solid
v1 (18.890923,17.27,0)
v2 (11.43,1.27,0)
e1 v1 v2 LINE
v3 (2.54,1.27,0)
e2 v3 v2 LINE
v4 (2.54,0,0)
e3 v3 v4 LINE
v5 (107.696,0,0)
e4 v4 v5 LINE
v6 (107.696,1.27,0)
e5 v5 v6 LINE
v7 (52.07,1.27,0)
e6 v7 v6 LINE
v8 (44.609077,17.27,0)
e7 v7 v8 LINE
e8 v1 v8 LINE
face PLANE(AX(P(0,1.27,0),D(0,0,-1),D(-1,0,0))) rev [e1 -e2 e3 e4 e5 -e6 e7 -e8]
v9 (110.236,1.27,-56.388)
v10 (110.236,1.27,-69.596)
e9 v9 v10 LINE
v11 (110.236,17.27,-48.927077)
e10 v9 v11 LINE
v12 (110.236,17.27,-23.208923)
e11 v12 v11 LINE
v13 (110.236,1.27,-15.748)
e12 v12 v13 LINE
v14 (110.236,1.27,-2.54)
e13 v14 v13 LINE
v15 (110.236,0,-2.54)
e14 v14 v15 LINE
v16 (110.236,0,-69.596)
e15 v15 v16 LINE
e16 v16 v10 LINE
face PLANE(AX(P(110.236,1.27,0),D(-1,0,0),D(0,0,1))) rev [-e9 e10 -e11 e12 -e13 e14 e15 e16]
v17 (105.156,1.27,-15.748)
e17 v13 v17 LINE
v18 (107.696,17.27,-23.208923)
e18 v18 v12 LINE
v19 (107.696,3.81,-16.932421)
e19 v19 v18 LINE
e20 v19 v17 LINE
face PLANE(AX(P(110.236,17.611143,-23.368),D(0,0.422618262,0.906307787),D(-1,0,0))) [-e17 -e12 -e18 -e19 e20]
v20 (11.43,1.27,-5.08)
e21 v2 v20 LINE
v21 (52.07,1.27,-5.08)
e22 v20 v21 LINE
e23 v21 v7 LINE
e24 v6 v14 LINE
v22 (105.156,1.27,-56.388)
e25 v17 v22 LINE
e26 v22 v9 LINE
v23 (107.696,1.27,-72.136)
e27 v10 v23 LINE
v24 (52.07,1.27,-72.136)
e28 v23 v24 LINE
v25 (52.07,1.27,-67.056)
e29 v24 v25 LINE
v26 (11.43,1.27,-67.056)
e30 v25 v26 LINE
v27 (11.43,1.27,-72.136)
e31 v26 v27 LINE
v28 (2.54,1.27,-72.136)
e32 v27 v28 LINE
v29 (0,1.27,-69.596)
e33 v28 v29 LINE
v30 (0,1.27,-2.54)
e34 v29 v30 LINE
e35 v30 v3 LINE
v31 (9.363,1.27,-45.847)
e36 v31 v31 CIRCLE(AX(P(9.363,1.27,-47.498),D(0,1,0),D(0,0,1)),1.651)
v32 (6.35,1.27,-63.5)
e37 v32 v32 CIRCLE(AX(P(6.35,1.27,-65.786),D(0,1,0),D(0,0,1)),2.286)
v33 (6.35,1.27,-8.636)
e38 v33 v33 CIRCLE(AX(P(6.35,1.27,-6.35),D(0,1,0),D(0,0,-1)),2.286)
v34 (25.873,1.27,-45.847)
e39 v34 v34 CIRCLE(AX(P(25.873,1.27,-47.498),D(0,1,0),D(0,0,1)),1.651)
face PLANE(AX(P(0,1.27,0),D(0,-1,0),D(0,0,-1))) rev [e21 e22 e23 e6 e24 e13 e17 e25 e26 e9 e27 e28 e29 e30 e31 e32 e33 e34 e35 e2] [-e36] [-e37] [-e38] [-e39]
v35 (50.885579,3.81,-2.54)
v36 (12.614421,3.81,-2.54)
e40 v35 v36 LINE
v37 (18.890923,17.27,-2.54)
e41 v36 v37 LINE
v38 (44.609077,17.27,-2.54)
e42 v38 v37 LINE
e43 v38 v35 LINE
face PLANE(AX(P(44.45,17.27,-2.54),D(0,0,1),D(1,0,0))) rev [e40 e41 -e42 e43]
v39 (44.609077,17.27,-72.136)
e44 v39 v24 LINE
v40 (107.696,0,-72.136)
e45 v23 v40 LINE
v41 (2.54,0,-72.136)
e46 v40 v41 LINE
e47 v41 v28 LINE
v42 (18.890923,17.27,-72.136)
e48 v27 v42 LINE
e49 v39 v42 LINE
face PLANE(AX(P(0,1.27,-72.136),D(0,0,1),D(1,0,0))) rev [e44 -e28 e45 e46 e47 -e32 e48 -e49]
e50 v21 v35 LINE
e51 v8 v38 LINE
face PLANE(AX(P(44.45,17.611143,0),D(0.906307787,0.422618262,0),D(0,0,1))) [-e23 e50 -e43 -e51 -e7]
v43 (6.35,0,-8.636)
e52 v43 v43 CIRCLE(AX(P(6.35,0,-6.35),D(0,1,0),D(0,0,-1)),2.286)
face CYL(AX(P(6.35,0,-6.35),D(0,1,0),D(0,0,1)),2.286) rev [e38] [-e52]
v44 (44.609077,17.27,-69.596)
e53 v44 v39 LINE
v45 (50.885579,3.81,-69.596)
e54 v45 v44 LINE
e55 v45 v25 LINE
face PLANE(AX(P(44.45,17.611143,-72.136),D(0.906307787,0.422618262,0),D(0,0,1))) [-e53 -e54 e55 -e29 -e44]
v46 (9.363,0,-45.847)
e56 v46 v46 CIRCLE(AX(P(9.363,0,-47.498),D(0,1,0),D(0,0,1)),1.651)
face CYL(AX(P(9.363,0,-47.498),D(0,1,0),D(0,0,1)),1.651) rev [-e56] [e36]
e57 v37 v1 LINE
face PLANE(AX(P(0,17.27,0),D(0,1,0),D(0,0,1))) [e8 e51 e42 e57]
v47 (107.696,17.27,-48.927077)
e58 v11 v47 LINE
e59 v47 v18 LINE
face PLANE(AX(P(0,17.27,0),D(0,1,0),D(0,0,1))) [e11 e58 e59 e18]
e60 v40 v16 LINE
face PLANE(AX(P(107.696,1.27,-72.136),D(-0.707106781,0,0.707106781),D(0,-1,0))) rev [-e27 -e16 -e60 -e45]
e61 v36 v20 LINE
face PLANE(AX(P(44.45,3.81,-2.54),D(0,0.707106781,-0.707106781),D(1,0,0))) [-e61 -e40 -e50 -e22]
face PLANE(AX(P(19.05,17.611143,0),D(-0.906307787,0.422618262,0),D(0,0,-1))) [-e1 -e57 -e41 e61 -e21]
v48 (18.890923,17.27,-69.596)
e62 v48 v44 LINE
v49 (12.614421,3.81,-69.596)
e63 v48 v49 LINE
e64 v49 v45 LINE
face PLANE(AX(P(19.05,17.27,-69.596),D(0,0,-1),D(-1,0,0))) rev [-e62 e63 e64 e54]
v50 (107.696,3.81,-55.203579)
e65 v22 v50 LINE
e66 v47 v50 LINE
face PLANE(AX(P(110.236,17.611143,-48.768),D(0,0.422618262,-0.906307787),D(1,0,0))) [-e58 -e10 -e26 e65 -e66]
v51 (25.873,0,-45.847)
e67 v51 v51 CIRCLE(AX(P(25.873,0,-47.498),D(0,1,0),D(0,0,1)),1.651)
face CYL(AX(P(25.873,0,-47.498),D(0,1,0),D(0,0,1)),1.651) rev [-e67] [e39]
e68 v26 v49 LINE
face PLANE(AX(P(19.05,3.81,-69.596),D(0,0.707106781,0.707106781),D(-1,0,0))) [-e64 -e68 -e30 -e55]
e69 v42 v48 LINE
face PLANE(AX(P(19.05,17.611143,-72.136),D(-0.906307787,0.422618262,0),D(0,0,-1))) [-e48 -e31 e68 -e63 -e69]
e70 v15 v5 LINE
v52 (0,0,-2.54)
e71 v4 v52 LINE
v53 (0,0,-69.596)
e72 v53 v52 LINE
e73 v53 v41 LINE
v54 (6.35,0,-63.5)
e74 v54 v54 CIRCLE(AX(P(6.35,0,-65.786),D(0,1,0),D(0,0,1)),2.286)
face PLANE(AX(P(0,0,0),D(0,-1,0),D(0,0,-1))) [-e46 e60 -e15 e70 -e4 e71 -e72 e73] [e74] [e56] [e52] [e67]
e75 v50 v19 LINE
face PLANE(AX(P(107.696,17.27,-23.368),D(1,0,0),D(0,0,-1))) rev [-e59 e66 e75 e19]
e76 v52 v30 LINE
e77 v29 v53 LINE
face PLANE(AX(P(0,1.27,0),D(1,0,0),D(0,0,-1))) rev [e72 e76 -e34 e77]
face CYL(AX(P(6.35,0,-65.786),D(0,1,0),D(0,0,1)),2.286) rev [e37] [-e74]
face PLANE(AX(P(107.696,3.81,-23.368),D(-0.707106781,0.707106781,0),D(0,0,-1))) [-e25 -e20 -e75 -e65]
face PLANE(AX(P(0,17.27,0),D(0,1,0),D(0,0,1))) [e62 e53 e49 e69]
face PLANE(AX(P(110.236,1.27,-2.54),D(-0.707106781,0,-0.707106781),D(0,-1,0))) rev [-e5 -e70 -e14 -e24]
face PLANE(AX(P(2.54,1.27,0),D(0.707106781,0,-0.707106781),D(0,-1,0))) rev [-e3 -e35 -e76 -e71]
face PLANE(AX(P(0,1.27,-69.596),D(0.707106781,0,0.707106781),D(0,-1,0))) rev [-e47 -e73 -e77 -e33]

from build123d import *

# Parameters (mm, degrees)
SKETCH1_W           = 110.236
SKETCH1_H           = 72.136
BOSS_EXTRUDE1_DEPTH = 1.27
SKETCH2_R           = 2.286
SKETCH2_R_2         = 1.651
CUT_EXTRUDE1_DEPTH  = 1.27
SKETCH3_W           = 25.4
SKETCH3_H           = 2.54
SKETCH3_W_2         = 2.54
SKETCH3_H_2         = 25.4
BOSS_EXTRUDE2_DEPTH = 16
CHAMFER1_SIZE       = 7.62
CHAMFER1_SIZE_2     = 16.341142734
CHAMFER2_SIZE       = 2.54
CHAMFER3_SIZE       = 2.54


with BuildPart() as part:
    # Sketch1 → Boss-Extrude1 (new body)
    with BuildSketch(Plane(origin=(0, 0, 0), x_dir=(1, 0, 0), z_dir=(0, 1, 0))):
        with Locations((55.118, 36.068)):
            Rectangle(SKETCH1_W, SKETCH1_H)
    extrude(amount=BOSS_EXTRUDE1_DEPTH)

    # Sketch2 → Cut-Extrude1 (cut)
    with BuildSketch(Plane(origin=(0, 1.27, 0), x_dir=(1, 0, 0), z_dir=(0, 1, 0))):
        with Locations(Location((6.35, 65.786, 0), (0, 0, 270))):
            Circle(SKETCH2_R)
        with Locations(Location((9.363, 47.498, 0), (0, 0, 270))):
            Circle(SKETCH2_R_2)
        with Locations(Location((25.873, 47.498, 0), (0, 0, 270))):
            Circle(SKETCH2_R_2)
        with Locations(Location((6.35, 6.35, 0), (0, 0, 90))):
            Circle(SKETCH2_R)
    extrude(amount=-CUT_EXTRUDE1_DEPTH, mode=Mode.SUBTRACT)

    # Sketch3 → Boss-Extrude2 (add)
    with BuildSketch(Plane(origin=(0, 1.27, 0), x_dir=(1, 0, 0), z_dir=(0, 1, 0))):
        with Locations((31.75, 70.866)):
            Rectangle(SKETCH3_W, SKETCH3_H)
        with Locations((31.75, 1.27)):
            Rectangle(SKETCH3_W, SKETCH3_H)
        with Locations((108.966, 36.068)):
            Rectangle(SKETCH3_W_2, SKETCH3_H_2)
    extrude(amount=BOSS_EXTRUDE2_DEPTH)

    # Chamfer1
    # the kernel refuses this chamfer: 16.341142734, 7.62 mm, written as the material it adds along each edge
    with BuildSketch(Plane(origin=(44.45, 1.27, -2.54), x_dir=(0.9971975577536774, -0.07481330637060034, 0), z_dir=(0, 0, 1))) as chamfer1_piece_1_section:
        Polygon((CHAMFER1_SIZE * 0.997197557754, CHAMFER1_SIZE * 0.0748133063706), (-CHAMFER1_SIZE_2 * 0.0748133063719, CHAMFER1_SIZE_2 * 0.997197557771), (0, 0), align=None)
    chamfer1_piece_1 = extrude(amount=2.54, mode=Mode.PRIVATE)
    chamfer1_piece_1 = split(chamfer1_piece_1, bisect_by=Plane(origin=(46.87141812, 17.27, -1.27), z_dir=(0, -1, 0)), keep=Keep.TOP, mode=Mode.PRIVATE)
    add(chamfer1_piece_1)
    with BuildSketch(Plane(origin=(44.45, 1.27, -72.136), x_dir=(0.9971975577536774, -0.07481330637060034, 2.7895727589747506e-15), z_dir=(0, 0, 1))) as chamfer1_piece_2_section:
        Polygon((CHAMFER1_SIZE * 0.997197557754, CHAMFER1_SIZE * 0.0748133063706), (-CHAMFER1_SIZE_2 * 0.0748133063719, CHAMFER1_SIZE_2 * 0.997197557771), (0, 0), align=None)
    chamfer1_piece_2 = extrude(amount=2.54, mode=Mode.PRIVATE)
    chamfer1_piece_2 = split(chamfer1_piece_2, bisect_by=Plane(origin=(46.87141812, 17.27, -70.866), z_dir=(0, -1, 0)), keep=Keep.TOP, mode=Mode.PRIVATE)
    add(chamfer1_piece_2)
    with BuildSketch(Plane(origin=(19.05, 1.27, 0), x_dir=(-0.9971975577536774, -0.07481330637060028, 0), z_dir=(0, 0, -1))) as chamfer1_piece_3_section:
        Polygon((CHAMFER1_SIZE * 0.997197557754, CHAMFER1_SIZE * 0.0748133063706), (-CHAMFER1_SIZE_2 * 0.0748133063719, CHAMFER1_SIZE_2 * 0.997197557771), (0, 0), align=None)
    chamfer1_piece_3 = extrude(amount=2.54, mode=Mode.PRIVATE)
    chamfer1_piece_3 = split(chamfer1_piece_3, bisect_by=Plane(origin=(16.62858188, 17.27, -1.27), z_dir=(0, -1, 0)), keep=Keep.TOP, mode=Mode.PRIVATE)
    add(chamfer1_piece_3)
    with BuildSketch(Plane(origin=(19.05, 1.27, -69.596), x_dir=(-0.9971975577536774, -0.07481330637060032, 5.5791455179495004e-15), z_dir=(0, 0, -1))) as chamfer1_piece_4_section:
        Polygon((CHAMFER1_SIZE * 0.997197557754, CHAMFER1_SIZE * 0.0748133063706), (-CHAMFER1_SIZE_2 * 0.0748133063719, CHAMFER1_SIZE_2 * 0.997197557771), (0, 0), align=None)
    chamfer1_piece_4 = extrude(amount=2.54, mode=Mode.PRIVATE)
    chamfer1_piece_4 = split(chamfer1_piece_4, bisect_by=Plane(origin=(16.62858188, 17.27, -70.866), z_dir=(0, -1, 0)), keep=Keep.TOP, mode=Mode.PRIVATE)
    add(chamfer1_piece_4)
    with BuildSketch(Plane(origin=(107.696, 1.27, -48.768), x_dir=(0, -0.07481330637060034, -0.9971975577536774), z_dir=(1, 0, 0))) as chamfer1_piece_5_section:
        Polygon((CHAMFER1_SIZE * 0.997197557754, CHAMFER1_SIZE * 0.0748133063706), (-CHAMFER1_SIZE_2 * 0.0748133063719, CHAMFER1_SIZE_2 * 0.997197557771), (0, 0), align=None)
    chamfer1_piece_5 = extrude(amount=2.54, mode=Mode.PRIVATE)
    chamfer1_piece_5 = split(chamfer1_piece_5, bisect_by=Plane(origin=(108.966, 17.27, -51.18941812), z_dir=(0, -1, 0)), keep=Keep.TOP, mode=Mode.PRIVATE)
    add(chamfer1_piece_5)
    with BuildSketch(Plane(origin=(110.236, 1.27, -23.368), x_dir=(0, -0.07481330637060032, 0.9971975577536774), z_dir=(-1, 0, 0))) as chamfer1_piece_6_section:
        Polygon((CHAMFER1_SIZE * 0.997197557754, CHAMFER1_SIZE * 0.0748133063706), (-CHAMFER1_SIZE_2 * 0.0748133063719, CHAMFER1_SIZE_2 * 0.997197557771), (0, 0), align=None)
    chamfer1_piece_6 = extrude(amount=2.54, mode=Mode.PRIVATE)
    chamfer1_piece_6 = split(chamfer1_piece_6, bisect_by=Plane(origin=(108.966, 17.27, -20.94658188), z_dir=(0, -1, 0)), keep=Keep.TOP, mode=Mode.PRIVATE)
    add(chamfer1_piece_6)

    # Chamfer2
    chamfer2_edges = [part.edges().sort_by_distance(p)[0] for p in [
        (31.75, 1.27, -69.596),
        (31.75, 1.27, -2.54),
        (107.696, 1.27, -36.068),
    ]]
    chamfer(chamfer2_edges, length=CHAMFER2_SIZE)

    # Chamfer3
    chamfer3_edges = [part.edges().sort_by_distance(p)[0] for p in [
        (0, 0.635, -72.136),
        (110.236, 0.635, -72.136),
        (110.236, 0.635, 0),
        (0, 0.635, 0),
    ]]
    chamfer(chamfer3_edges, length=CHAMFER3_SIZE)


solid = part.part
